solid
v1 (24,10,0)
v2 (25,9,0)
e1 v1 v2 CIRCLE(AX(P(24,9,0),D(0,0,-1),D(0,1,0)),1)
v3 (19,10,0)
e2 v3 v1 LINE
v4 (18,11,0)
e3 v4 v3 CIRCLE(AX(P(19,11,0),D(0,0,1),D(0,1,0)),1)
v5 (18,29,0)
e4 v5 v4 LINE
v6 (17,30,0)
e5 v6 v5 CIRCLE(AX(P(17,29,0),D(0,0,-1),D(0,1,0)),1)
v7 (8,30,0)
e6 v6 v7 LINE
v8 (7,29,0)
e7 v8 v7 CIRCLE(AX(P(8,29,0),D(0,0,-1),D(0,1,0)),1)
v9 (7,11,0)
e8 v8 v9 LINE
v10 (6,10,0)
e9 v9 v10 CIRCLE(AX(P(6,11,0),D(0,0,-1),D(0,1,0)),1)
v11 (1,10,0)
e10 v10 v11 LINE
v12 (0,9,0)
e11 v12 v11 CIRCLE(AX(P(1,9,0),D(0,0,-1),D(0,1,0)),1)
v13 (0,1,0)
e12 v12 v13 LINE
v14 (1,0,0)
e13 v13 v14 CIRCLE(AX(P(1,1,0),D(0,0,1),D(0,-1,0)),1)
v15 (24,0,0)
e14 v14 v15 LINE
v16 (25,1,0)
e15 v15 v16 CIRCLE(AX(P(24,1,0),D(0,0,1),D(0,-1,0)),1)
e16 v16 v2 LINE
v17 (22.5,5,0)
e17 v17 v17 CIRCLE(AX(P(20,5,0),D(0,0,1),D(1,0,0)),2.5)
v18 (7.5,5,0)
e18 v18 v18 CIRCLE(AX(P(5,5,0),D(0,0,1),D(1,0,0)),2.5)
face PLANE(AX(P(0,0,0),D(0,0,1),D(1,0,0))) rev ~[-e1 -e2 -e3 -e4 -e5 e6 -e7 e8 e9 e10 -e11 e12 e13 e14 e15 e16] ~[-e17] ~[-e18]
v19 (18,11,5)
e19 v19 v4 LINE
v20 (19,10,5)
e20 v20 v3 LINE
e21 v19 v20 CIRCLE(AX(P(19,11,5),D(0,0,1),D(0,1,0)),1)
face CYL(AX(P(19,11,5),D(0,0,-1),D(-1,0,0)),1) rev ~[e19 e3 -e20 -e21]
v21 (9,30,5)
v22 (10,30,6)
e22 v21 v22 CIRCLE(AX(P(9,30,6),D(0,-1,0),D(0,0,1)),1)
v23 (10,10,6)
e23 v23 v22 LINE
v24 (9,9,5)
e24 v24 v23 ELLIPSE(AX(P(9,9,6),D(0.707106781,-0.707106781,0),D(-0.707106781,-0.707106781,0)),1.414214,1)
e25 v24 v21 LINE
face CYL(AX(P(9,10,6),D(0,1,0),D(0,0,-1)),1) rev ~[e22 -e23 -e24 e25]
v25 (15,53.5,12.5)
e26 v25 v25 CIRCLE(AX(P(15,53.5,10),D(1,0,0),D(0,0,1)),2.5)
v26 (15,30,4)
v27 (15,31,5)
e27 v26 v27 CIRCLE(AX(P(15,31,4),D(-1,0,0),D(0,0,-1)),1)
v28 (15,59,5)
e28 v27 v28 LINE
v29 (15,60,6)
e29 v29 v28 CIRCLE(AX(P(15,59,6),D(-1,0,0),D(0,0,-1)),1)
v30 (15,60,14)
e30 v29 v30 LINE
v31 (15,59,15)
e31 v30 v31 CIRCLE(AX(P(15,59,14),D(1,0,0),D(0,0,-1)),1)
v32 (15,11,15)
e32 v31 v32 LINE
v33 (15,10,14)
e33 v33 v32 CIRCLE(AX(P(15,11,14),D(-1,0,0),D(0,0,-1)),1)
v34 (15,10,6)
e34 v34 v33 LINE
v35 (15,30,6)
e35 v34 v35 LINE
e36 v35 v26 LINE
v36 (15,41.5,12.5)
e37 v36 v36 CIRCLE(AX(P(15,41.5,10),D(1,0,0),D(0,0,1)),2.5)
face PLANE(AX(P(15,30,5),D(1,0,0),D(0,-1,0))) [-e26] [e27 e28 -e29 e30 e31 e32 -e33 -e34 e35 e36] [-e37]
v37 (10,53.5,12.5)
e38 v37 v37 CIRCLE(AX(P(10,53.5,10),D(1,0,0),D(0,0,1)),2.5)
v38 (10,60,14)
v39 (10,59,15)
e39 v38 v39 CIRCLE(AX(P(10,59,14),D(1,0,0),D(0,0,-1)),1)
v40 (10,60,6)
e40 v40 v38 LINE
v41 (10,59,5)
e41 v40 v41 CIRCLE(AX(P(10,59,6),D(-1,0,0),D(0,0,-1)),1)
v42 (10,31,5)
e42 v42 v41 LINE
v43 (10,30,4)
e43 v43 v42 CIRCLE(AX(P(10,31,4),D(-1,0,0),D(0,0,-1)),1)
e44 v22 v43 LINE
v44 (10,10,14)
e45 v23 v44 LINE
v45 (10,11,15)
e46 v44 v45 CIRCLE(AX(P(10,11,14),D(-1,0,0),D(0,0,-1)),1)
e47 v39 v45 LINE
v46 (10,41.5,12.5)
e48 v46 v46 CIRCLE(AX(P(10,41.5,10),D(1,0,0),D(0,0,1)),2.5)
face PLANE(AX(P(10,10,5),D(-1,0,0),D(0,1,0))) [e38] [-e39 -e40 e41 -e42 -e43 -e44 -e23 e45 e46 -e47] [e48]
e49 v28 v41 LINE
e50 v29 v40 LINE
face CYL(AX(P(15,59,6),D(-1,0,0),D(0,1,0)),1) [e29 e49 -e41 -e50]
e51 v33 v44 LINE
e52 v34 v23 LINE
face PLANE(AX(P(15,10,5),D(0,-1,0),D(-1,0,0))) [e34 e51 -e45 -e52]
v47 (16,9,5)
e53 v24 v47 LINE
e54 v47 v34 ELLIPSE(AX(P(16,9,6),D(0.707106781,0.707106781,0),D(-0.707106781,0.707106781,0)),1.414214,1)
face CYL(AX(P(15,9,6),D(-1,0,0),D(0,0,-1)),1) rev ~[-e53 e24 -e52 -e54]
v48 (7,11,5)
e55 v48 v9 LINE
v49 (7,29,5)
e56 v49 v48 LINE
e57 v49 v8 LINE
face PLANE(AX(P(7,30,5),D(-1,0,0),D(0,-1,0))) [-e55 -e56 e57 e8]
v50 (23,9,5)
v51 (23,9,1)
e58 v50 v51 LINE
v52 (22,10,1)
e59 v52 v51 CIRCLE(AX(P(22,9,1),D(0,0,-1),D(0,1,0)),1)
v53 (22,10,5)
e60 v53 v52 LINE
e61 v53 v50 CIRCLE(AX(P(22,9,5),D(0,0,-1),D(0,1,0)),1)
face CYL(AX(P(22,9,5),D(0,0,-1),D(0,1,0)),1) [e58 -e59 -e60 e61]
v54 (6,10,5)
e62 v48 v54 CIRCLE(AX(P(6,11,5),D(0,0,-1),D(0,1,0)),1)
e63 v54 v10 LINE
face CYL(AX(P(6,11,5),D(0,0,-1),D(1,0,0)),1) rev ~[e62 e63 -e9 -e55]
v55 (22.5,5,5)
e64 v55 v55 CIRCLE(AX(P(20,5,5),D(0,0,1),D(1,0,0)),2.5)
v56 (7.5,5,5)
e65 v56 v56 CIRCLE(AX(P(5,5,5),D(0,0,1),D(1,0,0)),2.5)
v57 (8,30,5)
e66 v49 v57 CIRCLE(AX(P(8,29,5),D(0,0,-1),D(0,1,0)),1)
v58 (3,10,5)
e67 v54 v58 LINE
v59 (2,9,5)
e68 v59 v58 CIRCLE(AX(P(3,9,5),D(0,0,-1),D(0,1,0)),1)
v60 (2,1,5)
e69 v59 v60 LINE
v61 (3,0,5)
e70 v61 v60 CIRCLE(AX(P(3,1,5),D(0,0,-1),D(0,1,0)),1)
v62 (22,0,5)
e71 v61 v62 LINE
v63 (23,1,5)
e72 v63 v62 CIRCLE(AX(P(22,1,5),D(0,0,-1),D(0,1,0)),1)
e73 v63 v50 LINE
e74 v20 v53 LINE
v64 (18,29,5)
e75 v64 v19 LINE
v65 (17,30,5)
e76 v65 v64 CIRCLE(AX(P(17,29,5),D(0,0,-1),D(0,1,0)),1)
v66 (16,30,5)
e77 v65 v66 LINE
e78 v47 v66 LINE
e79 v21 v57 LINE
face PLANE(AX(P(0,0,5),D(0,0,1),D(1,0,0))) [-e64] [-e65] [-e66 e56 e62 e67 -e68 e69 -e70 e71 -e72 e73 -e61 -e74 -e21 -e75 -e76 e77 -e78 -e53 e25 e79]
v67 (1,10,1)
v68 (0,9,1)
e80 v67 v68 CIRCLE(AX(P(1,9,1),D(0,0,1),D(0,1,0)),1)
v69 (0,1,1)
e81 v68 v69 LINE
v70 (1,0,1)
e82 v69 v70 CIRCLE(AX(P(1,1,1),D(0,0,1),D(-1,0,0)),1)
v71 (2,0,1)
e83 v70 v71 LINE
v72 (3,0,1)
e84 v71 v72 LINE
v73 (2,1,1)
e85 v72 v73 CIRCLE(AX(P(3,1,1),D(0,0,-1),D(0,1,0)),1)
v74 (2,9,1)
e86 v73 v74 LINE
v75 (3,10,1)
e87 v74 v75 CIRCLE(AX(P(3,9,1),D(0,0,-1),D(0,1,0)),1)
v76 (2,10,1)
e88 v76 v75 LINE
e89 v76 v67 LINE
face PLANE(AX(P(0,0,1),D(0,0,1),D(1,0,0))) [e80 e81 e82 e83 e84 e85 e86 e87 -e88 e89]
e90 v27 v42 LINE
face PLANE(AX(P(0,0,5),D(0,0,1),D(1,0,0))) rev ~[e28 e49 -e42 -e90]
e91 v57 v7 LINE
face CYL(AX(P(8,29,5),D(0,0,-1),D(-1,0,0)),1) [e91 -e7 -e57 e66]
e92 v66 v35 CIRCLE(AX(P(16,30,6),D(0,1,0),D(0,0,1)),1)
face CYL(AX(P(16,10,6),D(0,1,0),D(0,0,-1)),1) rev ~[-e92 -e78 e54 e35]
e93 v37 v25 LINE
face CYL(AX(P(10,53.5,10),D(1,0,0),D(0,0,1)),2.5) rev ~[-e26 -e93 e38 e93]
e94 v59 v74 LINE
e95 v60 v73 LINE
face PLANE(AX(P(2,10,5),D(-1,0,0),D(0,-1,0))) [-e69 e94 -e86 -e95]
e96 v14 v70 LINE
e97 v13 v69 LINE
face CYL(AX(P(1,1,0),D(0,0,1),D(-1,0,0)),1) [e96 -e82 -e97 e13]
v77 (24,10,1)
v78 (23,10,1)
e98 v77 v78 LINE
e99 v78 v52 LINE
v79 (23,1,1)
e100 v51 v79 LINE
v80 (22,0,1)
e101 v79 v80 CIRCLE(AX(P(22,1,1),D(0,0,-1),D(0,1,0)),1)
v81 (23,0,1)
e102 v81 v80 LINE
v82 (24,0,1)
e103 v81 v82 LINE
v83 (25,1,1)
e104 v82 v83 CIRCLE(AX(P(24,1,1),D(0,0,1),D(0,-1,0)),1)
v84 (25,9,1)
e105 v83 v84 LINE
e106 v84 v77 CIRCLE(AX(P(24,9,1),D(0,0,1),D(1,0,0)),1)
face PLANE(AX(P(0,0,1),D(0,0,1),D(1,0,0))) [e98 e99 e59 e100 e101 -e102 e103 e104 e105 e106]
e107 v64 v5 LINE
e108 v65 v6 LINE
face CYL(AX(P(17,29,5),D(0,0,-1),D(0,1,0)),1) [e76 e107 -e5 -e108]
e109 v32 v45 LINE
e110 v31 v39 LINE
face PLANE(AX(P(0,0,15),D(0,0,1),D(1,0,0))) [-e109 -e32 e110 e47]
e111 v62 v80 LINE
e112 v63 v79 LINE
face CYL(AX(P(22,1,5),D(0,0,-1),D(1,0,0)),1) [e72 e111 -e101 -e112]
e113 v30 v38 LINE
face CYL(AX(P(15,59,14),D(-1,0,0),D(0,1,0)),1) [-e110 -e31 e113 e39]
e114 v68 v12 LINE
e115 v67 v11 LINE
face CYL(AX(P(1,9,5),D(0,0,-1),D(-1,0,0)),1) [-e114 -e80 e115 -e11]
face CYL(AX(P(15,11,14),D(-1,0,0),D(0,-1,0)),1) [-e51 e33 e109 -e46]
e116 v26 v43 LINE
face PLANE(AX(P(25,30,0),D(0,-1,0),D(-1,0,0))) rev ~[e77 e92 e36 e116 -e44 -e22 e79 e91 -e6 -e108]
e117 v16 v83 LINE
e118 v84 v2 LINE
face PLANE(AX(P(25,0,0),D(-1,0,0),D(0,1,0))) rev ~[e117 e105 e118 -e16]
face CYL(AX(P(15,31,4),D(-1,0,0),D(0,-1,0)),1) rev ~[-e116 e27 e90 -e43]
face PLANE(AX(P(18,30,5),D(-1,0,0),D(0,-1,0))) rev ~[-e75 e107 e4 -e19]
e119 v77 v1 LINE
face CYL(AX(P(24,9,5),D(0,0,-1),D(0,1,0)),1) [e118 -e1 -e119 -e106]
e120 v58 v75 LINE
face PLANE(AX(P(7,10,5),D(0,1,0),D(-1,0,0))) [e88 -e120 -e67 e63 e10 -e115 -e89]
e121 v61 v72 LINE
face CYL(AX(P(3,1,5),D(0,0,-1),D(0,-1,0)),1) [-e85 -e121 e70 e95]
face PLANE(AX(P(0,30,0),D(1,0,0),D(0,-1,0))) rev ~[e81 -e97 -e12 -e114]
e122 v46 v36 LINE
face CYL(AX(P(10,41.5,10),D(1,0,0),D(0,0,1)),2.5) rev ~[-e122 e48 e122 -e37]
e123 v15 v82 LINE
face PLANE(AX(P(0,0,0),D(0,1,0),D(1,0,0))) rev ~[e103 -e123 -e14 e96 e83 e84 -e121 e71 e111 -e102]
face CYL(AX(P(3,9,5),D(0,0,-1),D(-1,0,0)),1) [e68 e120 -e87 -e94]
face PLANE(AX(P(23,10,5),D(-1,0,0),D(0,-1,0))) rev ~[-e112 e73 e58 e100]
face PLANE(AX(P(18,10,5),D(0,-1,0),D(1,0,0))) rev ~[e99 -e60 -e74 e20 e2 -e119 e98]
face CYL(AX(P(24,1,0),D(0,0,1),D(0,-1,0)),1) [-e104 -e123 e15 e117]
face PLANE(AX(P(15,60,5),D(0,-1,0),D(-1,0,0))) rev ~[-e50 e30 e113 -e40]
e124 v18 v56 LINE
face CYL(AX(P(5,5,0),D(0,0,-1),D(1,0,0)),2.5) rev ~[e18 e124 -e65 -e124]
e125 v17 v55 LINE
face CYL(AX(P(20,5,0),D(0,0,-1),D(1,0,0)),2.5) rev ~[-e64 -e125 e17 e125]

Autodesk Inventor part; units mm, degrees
ref_plane "YZ Plane" through (0, 0, 0) normal (1, 0, 0) x (0, 1, 0)
ref_plane "XZ Plane" through (0, 0, 0) normal (0, 1, 0) x (-1, 0, 0)
ref_plane "XY Plane" through (0, 0, 0) normal (0, 0, 1) x (1, 0, 0)
sketch "スケッチ6" plane through (0, 0, 0) normal (0, 0, 1) x (1, 0, 0)
  line L0 (0, 0) -> (25, 0)
  line L1 (25, 0) -> (25, 30)
  line L2 (25, 30) -> (0, 30)
  line L3 (0, 30) -> (0, 0)
  circle A0 centre (5, 5) radius 2.5
  circle A1 centre (20, 5) radius 2.5
  dimension "d39" = 5
  dimension "d40" = 5
  dimension "d41" = 5
  dimension "d42" = 5
  dimension "d43" = 15
  dimension "d44" = 5
  dimension "d45" = 5
  dimension "d46" = 30
extrude "押し出し4" add sketch "スケッチ6" along normal blind 5
sketch "スケッチ7" plane through (0, 0, 5) normal (0, 0, 1) x (1, 0, 0)
  line L0 (25, 30) -> (0, 30) projected
  line L1 (10, 30) -> (15, 30)
  line L2 (15, 30) -> (15, 10)
  line L3 (15, 10) -> (10, 10)
  line L4 (10, 10) -> (10, 30)
  line L5 (25, 0) -> (25, 30) projected
  line L6 (0, 30) -> (0, 0) projected
  line L7 (0, 0) -> (25, 0) projected
  line L8 (10, 30) -> (15, 30)
  line L9 (15, 30) -> (15, 60)
  line L10 (15, 60) -> (10, 60)
  line L11 (10, 60) -> (10, 30)
  dimension "d49" = 5
  dimension "d50" = 10
  dimension "d51" = 10
  dimension "d52" = 10
  dimension "d55" = 30
  dimension "d56" = 5
extrude "押し出し5" add sketch "スケッチ7" along normal blind 10 contours L2 L3 L4 L0 | L0 L11 L10 L9
sketch "スケッチ8" plane through (10, 30, 5) normal (-1, 0, 0) x (0, 0, 1)
  line L0 (10, 30) -> (10, -20) projected
  line L1 (0, 30) -> (10, 30) projected
  line L2 (0, -20) -> (10, -20) projected
  point P0 (-5, -30)
  point P1 (5, 11.5)
  point P2 (5, 23.5)
  dimension "d57" = 5
  dimension "d58" = 5
  dimension "d59" = 12
  dimension "d60" = 6.5
  dimension "d61" = 31.5
hole "穴3" at (10, 41.5, 10) at (10, 53.5, 10) direction (1, 0, 0) diameter 5 depth 8
sketch "スケッチ9" plane through (0, 0, 5) normal (0, 0, 1) x (1, 0, 0)
  line L0 (10, 30) -> (0, 30) projected
  line L1 (0, 30) -> (7, 30)
  line L2 (7, 30) -> (7, 10)
  line L3 (7, 10) -> (0, 10)
  line L4 (0, 10) -> (0, 30)
  line L5 (25, 0) -> (25, 30) projected
  line L6 (25, 30) -> (18, 30)
  line L7 (18, 30) -> (18, 10)
  line L8 (18, 10) -> (25, 10)
  line L9 (25, 10) -> (25, 30)
  point P0 (0, 0)
  point P1 (5, 30)
  point P2 (18, 20)
  point P3 (7, 20)
  dimension "d70" = 20
  dimension "d72" = 7
  dimension "d73" = 7
extrude "押し出し6" cut sketch "スケッチ9" against normal blind 10
fillet "フィレット4" radius 1 15 edges at (7, 30, 2.5) (12.5, 60, 5) (12.5, 60, 15) (12.5, 10, 15) (7, 10, 2.5) (0, 10, 2.5) (0, 0, 2.5) (18, 30, 2.5) (18, 10, 2.5) (25, 10, 2.5) (25, 0, 2.5) (10, 20, 5) (12.5, 30, 5) (15, 20, 5) (12.5, 10, 5)
sketch "スケッチ10" plane through (0, 0, 5) normal (0, 0, 1) x (1, 0, 0)
  line L0 (9, 30) -> (9, 9) projected
  line L1 (9, 30) -> (8, 30) projected
  arc A0 (8, 30) -> (7, 29) centre (8, 29) ccw projected
  line L2 (7, 29) -> (7, 11) projected
  arc A1 (6, 10) -> (7, 11) centre (6, 11) ccw projected
  line L3 (6, 10) -> (1, 10) projected
  arc A2 (1, 10) -> (0, 9) centre (1, 9) ccw projected
  line L4 (0, 9) -> (0, 1) projected
  arc A3 (0, 1) -> (1, 0) centre (1, 1) ccw projected
  line L5 (1, 0) -> (24, 0) projected
  arc A4 (24, 0) -> (25, 1) centre (24, 1) ccw projected
  line L6 (25, 1) -> (25, 9) projected
  arc A5 (25, 9) -> (24, 10) centre (24, 9) ccw projected
  line L7 (24, 10) -> (19, 10) projected
  arc A6 (18, 11) -> (19, 10) centre (19, 11) ccw projected
  line L8 (18, 11) -> (18, 29) projected
  arc A7 (18, 29) -> (17, 30) centre (17, 29) ccw projected
  line L9 (17, 30) -> (16, 30) projected
  line L10 (16, 9) -> (16, 30) projected
  line L11 (9, 9) -> (16, 9) projected
  circle A8 centre (5, 5) radius 2.5 projected
  circle A9 centre (20, 5) radius 2.5 projected
  line L12 (2, 8) -> (23, 8)
  line L13 (23, 8) -> (23, 2)
  line L14 (23, 2) -> (2, 2)
  line L15 (2, 2) -> (2, 8)
  line L16 (2, 10) -> (2, 0)
  line L17 (24, 10) -> (19, 10) projected
  line L18 (23, 10) -> (23, 0)
  point P0 (0, 0)
  point P1 (2, 2)
  point P2 (23, 2)
  dimension "d77" = 2
  dimension "d78" = 2
  dimension "d79" = 2
  dimension "d80" = 2
extrude "押し出し7" cut sketch "スケッチ10" against normal blind 4 contours L16 L15 L5 A3 L4 A2 L3 | L18 L7 A5 L6 A4 L5 L13
fillet "フィレット5" radius 1 4 edges at (23, 10, 3) (23, 0, 3) (2, 10, 3) (2, 0, 3)
equation "\"d42\" = d41"
equation "\"d45\" = d44"
equation "\"d58\" = d57"
equation "\"d73\" = d72"
properties part number "BP_BOX-Support-Bar-Connect1-Right" material "ABS プラスチック"
